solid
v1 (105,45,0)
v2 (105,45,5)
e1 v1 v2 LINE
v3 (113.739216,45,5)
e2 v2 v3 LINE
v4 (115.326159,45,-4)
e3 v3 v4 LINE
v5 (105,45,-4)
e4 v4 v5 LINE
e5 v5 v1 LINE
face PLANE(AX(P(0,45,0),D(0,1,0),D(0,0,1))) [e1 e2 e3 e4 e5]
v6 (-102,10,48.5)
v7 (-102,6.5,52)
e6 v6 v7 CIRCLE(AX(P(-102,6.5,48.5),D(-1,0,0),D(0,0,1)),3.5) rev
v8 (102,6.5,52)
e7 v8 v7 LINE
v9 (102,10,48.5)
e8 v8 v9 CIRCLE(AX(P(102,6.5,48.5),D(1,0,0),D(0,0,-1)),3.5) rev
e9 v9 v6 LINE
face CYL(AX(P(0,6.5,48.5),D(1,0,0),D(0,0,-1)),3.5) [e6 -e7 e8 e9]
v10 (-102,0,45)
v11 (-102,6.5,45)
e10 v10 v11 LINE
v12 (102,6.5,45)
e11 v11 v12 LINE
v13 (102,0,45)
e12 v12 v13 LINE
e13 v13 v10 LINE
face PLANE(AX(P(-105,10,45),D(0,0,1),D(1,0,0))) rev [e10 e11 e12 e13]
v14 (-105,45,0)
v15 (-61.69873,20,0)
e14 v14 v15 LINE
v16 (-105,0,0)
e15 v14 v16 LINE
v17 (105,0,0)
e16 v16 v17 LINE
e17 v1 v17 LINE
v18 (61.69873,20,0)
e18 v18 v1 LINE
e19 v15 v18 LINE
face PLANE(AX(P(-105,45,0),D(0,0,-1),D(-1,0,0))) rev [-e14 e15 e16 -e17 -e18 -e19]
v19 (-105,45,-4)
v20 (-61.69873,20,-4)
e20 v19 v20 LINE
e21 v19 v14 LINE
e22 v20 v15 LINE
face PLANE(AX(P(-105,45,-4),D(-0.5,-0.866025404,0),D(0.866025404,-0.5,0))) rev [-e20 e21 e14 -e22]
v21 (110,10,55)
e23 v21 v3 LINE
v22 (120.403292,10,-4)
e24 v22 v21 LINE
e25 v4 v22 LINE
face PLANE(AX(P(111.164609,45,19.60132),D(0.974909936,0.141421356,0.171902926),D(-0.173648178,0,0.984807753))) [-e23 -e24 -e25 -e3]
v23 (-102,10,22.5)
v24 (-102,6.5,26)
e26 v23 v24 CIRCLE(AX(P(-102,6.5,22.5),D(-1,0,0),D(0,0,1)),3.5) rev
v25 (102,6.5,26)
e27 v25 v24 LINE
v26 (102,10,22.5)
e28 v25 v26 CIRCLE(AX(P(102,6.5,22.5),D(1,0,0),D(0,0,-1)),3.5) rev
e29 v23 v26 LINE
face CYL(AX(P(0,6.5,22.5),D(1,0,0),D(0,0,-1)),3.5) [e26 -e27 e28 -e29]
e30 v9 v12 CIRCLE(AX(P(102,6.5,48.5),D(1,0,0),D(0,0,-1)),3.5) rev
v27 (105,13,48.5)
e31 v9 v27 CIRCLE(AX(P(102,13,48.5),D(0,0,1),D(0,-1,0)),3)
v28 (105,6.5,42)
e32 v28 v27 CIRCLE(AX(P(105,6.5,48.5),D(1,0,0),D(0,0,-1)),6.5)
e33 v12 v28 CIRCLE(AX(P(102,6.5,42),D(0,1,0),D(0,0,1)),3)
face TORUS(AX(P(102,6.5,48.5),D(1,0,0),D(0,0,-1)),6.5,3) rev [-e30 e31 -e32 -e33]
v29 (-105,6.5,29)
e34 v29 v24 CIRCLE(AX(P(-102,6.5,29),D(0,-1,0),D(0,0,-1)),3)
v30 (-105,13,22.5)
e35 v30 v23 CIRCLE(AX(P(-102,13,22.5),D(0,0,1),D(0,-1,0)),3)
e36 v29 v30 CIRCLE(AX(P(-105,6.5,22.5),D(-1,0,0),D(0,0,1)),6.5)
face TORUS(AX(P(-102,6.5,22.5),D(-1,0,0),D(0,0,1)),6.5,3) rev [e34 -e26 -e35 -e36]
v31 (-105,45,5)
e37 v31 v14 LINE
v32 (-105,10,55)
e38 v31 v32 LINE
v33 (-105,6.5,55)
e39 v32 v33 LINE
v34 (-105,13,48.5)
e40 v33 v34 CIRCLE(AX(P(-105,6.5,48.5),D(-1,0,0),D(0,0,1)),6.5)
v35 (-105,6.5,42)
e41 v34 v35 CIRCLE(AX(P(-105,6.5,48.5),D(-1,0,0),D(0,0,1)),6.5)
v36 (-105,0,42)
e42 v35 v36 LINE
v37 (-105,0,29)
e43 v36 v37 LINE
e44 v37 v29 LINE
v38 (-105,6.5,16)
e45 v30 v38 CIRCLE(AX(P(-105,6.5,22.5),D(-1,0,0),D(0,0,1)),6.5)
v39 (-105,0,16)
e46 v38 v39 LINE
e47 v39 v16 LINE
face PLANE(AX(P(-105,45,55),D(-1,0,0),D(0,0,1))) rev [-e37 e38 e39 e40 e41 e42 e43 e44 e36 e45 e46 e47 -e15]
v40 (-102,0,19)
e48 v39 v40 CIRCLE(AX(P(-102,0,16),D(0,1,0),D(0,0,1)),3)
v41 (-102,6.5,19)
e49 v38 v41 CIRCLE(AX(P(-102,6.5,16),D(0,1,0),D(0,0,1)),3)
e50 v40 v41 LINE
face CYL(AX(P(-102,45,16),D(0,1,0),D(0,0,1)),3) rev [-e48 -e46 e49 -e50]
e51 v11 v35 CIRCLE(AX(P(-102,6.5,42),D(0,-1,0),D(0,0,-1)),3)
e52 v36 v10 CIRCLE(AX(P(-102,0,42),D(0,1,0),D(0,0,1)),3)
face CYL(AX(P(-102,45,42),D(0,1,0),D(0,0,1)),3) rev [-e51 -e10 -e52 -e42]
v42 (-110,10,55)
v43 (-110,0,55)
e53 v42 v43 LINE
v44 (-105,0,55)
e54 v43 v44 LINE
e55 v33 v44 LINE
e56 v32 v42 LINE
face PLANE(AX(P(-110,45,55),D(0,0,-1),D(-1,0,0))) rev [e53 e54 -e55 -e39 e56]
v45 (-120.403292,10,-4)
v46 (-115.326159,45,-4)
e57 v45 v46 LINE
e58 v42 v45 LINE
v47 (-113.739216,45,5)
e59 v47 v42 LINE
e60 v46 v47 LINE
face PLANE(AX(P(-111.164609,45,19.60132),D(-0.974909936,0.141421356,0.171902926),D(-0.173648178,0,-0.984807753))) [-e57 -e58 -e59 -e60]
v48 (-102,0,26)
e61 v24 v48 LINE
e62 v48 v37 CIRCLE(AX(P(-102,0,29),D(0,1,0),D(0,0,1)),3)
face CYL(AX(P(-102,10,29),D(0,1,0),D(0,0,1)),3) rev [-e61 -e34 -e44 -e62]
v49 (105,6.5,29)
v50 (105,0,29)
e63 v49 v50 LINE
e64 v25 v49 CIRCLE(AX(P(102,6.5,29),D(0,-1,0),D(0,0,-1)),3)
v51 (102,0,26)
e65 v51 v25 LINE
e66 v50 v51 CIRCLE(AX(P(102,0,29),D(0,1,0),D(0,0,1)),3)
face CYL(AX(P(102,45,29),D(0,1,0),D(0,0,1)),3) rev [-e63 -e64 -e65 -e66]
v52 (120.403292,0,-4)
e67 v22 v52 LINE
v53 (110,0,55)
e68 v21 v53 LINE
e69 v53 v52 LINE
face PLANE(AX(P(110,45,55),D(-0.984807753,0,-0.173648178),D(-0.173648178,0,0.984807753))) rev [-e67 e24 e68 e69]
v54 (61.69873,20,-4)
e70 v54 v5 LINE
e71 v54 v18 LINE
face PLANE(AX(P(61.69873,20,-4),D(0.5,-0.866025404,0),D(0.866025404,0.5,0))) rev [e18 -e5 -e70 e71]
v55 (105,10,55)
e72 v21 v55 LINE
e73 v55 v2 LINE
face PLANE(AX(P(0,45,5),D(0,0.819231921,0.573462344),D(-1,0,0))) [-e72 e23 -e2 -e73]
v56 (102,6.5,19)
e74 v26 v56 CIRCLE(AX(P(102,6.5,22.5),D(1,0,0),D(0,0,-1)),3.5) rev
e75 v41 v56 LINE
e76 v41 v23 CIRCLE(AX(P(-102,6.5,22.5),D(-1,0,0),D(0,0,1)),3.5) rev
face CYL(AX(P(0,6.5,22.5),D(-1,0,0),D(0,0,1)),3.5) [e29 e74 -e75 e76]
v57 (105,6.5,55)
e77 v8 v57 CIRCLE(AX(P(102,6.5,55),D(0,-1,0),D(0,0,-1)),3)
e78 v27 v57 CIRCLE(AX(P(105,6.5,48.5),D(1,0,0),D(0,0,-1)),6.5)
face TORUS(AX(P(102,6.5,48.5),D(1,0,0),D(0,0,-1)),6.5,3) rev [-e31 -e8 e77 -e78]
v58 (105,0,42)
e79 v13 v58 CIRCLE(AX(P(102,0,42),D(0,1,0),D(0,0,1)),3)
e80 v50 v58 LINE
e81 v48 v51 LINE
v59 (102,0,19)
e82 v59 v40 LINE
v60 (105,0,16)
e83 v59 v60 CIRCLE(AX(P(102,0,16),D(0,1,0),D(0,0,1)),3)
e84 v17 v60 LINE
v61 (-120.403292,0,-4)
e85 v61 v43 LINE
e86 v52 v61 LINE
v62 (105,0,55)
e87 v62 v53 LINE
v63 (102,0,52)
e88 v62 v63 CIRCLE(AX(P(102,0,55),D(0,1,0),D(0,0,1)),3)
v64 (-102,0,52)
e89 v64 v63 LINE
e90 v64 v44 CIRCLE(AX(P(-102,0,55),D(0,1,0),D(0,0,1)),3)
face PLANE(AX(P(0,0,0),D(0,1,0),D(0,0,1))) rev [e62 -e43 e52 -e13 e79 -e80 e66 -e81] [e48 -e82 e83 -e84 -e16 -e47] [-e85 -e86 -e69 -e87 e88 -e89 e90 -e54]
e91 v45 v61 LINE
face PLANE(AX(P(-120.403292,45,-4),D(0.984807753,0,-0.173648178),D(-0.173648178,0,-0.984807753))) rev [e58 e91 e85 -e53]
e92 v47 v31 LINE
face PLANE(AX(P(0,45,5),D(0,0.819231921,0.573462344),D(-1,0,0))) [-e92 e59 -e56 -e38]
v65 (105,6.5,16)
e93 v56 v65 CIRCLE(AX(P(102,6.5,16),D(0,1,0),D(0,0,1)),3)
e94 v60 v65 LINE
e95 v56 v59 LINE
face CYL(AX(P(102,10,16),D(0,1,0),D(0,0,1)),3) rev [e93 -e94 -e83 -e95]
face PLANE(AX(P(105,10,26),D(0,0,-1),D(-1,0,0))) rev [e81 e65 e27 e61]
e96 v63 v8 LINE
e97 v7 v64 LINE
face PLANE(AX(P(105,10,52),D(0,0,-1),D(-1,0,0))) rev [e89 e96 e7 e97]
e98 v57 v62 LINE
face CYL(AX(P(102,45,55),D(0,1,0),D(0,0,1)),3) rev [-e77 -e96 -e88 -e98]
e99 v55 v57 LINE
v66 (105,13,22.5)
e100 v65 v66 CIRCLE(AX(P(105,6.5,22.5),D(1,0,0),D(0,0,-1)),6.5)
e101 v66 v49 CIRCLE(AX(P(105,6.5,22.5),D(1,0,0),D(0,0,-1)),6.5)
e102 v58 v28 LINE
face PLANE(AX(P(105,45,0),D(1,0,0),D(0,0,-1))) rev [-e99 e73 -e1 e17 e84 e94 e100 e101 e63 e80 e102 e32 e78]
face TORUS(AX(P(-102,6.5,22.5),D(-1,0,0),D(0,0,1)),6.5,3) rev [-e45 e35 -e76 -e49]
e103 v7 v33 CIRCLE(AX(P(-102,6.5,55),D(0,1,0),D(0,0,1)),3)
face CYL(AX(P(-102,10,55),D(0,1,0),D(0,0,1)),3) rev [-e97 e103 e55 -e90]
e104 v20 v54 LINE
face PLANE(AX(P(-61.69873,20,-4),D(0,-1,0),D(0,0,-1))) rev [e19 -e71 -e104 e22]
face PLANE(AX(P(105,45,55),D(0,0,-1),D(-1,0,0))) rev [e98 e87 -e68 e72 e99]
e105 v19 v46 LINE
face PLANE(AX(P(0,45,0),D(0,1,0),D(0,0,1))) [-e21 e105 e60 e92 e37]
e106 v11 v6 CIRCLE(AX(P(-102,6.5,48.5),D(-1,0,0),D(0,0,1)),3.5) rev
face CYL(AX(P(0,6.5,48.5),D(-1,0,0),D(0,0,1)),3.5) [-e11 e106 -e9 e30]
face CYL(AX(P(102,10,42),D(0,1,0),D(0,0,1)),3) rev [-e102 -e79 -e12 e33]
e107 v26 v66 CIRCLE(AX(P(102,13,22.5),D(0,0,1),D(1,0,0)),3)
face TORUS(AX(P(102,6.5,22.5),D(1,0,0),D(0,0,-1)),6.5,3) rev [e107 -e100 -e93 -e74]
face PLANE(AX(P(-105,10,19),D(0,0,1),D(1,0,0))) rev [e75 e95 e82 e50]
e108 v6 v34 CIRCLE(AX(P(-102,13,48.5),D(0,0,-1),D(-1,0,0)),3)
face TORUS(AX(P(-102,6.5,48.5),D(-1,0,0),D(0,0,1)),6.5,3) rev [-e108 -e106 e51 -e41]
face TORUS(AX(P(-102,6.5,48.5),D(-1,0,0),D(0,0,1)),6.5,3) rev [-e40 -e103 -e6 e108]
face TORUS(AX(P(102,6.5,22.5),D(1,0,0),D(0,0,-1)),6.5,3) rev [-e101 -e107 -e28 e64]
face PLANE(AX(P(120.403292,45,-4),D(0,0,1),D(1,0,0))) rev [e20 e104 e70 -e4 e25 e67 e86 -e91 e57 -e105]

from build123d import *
from OCP.BRepFilletAPI import BRepFilletAPI_MakeChamfer

# Parameters (mm, degrees)
AUFSATZ_LINEAR_AUSTRAGEN1_DEPTH = 45
FASE1_SIZE                      = 35
FASE1_SIZE2                     = 50
FASE2_SIZE                      = 35
FASE2_SIZE2                     = 5
SCHNITT_LINEAR_AUSTRAGEN2_DEPTH = 140.810416962
SKIZZE4_W                       = 210
SKIZZE4_H                       = 7
AUFSATZ_LINEAR_AUSTRAGEN2_DEPTH = 10
VERRUNDUNG2_R                   = 3.5
VERRUNDUNG3_R                   = 3


with BuildPart() as part:
    # Skizze1 → Aufsatz-Linear austragen1 (new body)
    with BuildSketch(Plane(origin=(0, 0, 0), x_dir=(1, 0, 0), z_dir=(0, 1, 0))):
        Polygon((-105, -55), (-105, 0), (105, 0), (105, -55), (110, -55), (120.403291862, 4), (-120.403291862, 4), (-110, -55), align=None)
    extrude(amount=AUFSATZ_LINEAR_AUSTRAGEN1_DEPTH)

    # Fase1: one chamfer whose edges measure the first distance from different faces: ONE call of the kernel's chamfer builder (chamfer() names one face for all edges)
    fase1_edges_1 = [part.edges().sort_by_distance(p)[0] for p in [
        (107.5, 45, 55),
    ]]
    fase1_side_1 = [part.faces().sort_by_distance(p)[0] for p in [
        (107.5, 22.5, 55),
    ]]
    fase1_edges_2 = [part.edges().sort_by_distance(p)[0] for p in [
        (-107.5, 45, 55),
    ]]
    fase1_side_2 = [part.faces().sort_by_distance(p)[0] for p in [
        (-107.5, 22.5, 55),
    ]]
    fase1 = BRepFilletAPI_MakeChamfer(part.part.solid().wrapped)
    for e in fase1_edges_1:
        fase1.Add(FASE1_SIZE, FASE1_SIZE2, e.wrapped, fase1_side_1[0].wrapped)  # the first distance lies on this face
    for e in fase1_edges_2:
        fase1.Add(FASE1_SIZE, FASE1_SIZE2, e.wrapped, fase1_side_2[0].wrapped)  # the first distance lies on this face
    add(Compound.cast(fase1.Shape()), mode=Mode.REPLACE)

    # Fase2: one chamfer whose edges measure the first distance from different faces: ONE call of the kernel's chamfer builder (chamfer() names one face for all edges)
    fase2_edges_1 = [part.edges().sort_by_distance(p)[0] for p in [
        (-119.609820449, 45, 0.5),
    ]]
    fase2_side_1 = [part.faces().sort_by_distance(p)[0] for p in [
        (-116.314008321, 17.174625468, 19.191479401),
    ]]
    fase2_edges_2 = [part.edges().sort_by_distance(p)[0] for p in [
        (119.609820449, 45, 0.5),
    ]]
    fase2_side_2 = [part.faces().sort_by_distance(p)[0] for p in [
        (116.314008321, 17.174625468, 19.191479401),
    ]]
    fase2 = BRepFilletAPI_MakeChamfer(part.part.solid().wrapped)
    for e in fase2_edges_1:
        fase2.Add(FASE2_SIZE, FASE2_SIZE2, e.wrapped, fase2_side_1[0].wrapped)  # the first distance lies on this face
    for e in fase2_edges_2:
        fase2.Add(FASE2_SIZE, FASE2_SIZE2, e.wrapped, fase2_side_2[0].wrapped)  # the first distance lies on this face
    add(Compound.cast(fase2.Shape()), mode=Mode.REPLACE)

    # Skizze2 → Schnitt-Linear austragen2 (cut, through all)
    with BuildSketch(Plane.XY):
        Polygon((-105, 45), (-61.698729811, 20), (61.698729811, 20), (105, 45), align=None)
    extrude(amount=-SCHNITT_LINEAR_AUSTRAGEN2_DEPTH, mode=Mode.SUBTRACT)

    # Skizze4 → Aufsatz-Linear austragen2 (add)
    with BuildSketch(Plane(origin=(0, 0, 0), x_dir=(1, 0, 0), z_dir=(0, 1, 0))):
        with Locations((0, -48.5)):
            Rectangle(SKIZZE4_W, SKIZZE4_H)
        with Locations((0, -22.5)):
            Rectangle(SKIZZE4_W, SKIZZE4_H)
    extrude(amount=AUFSATZ_LINEAR_AUSTRAGEN2_DEPTH)

    # Verrundung2
    verrundung2_edges = [part.edges().sort_by_distance(p)[0] for p in [
        (0, 10, 52),
        (0, 10, 45),
        (0, 10, 19),
        (0, 10, 26),
    ]]
    fillet(verrundung2_edges, radius=VERRUNDUNG2_R - 0.0001)  # a hair under: the kernel refuses the full size

    # Verrundung3
    verrundung3_edges = [part.edges().sort_by_distance(p)[0] for p in [
        (-105, 8.974903023, 24.974903023),
        (105, 3.25005, 52),
        (-105, 3.25005, 52),
        (-105, 3.25005, 45),
        (105, 3.25005, 45),
        (-105, 3.25005, 19),
        (105, 3.25005, 19),
        (105, 3.25005, 26),
        (-105, 3.25005, 26),
        (105, 8.974903023, 50.974903023),
        (-105, 8.974903023, 50.974903023),
        (-105, 8.974903023, 46.025096977),
        (105, 8.974903023, 46.025096977),
        (-105, 8.974903023, 20.025096977),
        (105, 8.974903023, 20.025096977),
        (105, 8.974903023, 24.974903023),
    ]]
    fillet(verrundung3_edges, radius=VERRUNDUNG3_R - 0.0001)  # a hair under: the kernel refuses the full size


solid = part.part
